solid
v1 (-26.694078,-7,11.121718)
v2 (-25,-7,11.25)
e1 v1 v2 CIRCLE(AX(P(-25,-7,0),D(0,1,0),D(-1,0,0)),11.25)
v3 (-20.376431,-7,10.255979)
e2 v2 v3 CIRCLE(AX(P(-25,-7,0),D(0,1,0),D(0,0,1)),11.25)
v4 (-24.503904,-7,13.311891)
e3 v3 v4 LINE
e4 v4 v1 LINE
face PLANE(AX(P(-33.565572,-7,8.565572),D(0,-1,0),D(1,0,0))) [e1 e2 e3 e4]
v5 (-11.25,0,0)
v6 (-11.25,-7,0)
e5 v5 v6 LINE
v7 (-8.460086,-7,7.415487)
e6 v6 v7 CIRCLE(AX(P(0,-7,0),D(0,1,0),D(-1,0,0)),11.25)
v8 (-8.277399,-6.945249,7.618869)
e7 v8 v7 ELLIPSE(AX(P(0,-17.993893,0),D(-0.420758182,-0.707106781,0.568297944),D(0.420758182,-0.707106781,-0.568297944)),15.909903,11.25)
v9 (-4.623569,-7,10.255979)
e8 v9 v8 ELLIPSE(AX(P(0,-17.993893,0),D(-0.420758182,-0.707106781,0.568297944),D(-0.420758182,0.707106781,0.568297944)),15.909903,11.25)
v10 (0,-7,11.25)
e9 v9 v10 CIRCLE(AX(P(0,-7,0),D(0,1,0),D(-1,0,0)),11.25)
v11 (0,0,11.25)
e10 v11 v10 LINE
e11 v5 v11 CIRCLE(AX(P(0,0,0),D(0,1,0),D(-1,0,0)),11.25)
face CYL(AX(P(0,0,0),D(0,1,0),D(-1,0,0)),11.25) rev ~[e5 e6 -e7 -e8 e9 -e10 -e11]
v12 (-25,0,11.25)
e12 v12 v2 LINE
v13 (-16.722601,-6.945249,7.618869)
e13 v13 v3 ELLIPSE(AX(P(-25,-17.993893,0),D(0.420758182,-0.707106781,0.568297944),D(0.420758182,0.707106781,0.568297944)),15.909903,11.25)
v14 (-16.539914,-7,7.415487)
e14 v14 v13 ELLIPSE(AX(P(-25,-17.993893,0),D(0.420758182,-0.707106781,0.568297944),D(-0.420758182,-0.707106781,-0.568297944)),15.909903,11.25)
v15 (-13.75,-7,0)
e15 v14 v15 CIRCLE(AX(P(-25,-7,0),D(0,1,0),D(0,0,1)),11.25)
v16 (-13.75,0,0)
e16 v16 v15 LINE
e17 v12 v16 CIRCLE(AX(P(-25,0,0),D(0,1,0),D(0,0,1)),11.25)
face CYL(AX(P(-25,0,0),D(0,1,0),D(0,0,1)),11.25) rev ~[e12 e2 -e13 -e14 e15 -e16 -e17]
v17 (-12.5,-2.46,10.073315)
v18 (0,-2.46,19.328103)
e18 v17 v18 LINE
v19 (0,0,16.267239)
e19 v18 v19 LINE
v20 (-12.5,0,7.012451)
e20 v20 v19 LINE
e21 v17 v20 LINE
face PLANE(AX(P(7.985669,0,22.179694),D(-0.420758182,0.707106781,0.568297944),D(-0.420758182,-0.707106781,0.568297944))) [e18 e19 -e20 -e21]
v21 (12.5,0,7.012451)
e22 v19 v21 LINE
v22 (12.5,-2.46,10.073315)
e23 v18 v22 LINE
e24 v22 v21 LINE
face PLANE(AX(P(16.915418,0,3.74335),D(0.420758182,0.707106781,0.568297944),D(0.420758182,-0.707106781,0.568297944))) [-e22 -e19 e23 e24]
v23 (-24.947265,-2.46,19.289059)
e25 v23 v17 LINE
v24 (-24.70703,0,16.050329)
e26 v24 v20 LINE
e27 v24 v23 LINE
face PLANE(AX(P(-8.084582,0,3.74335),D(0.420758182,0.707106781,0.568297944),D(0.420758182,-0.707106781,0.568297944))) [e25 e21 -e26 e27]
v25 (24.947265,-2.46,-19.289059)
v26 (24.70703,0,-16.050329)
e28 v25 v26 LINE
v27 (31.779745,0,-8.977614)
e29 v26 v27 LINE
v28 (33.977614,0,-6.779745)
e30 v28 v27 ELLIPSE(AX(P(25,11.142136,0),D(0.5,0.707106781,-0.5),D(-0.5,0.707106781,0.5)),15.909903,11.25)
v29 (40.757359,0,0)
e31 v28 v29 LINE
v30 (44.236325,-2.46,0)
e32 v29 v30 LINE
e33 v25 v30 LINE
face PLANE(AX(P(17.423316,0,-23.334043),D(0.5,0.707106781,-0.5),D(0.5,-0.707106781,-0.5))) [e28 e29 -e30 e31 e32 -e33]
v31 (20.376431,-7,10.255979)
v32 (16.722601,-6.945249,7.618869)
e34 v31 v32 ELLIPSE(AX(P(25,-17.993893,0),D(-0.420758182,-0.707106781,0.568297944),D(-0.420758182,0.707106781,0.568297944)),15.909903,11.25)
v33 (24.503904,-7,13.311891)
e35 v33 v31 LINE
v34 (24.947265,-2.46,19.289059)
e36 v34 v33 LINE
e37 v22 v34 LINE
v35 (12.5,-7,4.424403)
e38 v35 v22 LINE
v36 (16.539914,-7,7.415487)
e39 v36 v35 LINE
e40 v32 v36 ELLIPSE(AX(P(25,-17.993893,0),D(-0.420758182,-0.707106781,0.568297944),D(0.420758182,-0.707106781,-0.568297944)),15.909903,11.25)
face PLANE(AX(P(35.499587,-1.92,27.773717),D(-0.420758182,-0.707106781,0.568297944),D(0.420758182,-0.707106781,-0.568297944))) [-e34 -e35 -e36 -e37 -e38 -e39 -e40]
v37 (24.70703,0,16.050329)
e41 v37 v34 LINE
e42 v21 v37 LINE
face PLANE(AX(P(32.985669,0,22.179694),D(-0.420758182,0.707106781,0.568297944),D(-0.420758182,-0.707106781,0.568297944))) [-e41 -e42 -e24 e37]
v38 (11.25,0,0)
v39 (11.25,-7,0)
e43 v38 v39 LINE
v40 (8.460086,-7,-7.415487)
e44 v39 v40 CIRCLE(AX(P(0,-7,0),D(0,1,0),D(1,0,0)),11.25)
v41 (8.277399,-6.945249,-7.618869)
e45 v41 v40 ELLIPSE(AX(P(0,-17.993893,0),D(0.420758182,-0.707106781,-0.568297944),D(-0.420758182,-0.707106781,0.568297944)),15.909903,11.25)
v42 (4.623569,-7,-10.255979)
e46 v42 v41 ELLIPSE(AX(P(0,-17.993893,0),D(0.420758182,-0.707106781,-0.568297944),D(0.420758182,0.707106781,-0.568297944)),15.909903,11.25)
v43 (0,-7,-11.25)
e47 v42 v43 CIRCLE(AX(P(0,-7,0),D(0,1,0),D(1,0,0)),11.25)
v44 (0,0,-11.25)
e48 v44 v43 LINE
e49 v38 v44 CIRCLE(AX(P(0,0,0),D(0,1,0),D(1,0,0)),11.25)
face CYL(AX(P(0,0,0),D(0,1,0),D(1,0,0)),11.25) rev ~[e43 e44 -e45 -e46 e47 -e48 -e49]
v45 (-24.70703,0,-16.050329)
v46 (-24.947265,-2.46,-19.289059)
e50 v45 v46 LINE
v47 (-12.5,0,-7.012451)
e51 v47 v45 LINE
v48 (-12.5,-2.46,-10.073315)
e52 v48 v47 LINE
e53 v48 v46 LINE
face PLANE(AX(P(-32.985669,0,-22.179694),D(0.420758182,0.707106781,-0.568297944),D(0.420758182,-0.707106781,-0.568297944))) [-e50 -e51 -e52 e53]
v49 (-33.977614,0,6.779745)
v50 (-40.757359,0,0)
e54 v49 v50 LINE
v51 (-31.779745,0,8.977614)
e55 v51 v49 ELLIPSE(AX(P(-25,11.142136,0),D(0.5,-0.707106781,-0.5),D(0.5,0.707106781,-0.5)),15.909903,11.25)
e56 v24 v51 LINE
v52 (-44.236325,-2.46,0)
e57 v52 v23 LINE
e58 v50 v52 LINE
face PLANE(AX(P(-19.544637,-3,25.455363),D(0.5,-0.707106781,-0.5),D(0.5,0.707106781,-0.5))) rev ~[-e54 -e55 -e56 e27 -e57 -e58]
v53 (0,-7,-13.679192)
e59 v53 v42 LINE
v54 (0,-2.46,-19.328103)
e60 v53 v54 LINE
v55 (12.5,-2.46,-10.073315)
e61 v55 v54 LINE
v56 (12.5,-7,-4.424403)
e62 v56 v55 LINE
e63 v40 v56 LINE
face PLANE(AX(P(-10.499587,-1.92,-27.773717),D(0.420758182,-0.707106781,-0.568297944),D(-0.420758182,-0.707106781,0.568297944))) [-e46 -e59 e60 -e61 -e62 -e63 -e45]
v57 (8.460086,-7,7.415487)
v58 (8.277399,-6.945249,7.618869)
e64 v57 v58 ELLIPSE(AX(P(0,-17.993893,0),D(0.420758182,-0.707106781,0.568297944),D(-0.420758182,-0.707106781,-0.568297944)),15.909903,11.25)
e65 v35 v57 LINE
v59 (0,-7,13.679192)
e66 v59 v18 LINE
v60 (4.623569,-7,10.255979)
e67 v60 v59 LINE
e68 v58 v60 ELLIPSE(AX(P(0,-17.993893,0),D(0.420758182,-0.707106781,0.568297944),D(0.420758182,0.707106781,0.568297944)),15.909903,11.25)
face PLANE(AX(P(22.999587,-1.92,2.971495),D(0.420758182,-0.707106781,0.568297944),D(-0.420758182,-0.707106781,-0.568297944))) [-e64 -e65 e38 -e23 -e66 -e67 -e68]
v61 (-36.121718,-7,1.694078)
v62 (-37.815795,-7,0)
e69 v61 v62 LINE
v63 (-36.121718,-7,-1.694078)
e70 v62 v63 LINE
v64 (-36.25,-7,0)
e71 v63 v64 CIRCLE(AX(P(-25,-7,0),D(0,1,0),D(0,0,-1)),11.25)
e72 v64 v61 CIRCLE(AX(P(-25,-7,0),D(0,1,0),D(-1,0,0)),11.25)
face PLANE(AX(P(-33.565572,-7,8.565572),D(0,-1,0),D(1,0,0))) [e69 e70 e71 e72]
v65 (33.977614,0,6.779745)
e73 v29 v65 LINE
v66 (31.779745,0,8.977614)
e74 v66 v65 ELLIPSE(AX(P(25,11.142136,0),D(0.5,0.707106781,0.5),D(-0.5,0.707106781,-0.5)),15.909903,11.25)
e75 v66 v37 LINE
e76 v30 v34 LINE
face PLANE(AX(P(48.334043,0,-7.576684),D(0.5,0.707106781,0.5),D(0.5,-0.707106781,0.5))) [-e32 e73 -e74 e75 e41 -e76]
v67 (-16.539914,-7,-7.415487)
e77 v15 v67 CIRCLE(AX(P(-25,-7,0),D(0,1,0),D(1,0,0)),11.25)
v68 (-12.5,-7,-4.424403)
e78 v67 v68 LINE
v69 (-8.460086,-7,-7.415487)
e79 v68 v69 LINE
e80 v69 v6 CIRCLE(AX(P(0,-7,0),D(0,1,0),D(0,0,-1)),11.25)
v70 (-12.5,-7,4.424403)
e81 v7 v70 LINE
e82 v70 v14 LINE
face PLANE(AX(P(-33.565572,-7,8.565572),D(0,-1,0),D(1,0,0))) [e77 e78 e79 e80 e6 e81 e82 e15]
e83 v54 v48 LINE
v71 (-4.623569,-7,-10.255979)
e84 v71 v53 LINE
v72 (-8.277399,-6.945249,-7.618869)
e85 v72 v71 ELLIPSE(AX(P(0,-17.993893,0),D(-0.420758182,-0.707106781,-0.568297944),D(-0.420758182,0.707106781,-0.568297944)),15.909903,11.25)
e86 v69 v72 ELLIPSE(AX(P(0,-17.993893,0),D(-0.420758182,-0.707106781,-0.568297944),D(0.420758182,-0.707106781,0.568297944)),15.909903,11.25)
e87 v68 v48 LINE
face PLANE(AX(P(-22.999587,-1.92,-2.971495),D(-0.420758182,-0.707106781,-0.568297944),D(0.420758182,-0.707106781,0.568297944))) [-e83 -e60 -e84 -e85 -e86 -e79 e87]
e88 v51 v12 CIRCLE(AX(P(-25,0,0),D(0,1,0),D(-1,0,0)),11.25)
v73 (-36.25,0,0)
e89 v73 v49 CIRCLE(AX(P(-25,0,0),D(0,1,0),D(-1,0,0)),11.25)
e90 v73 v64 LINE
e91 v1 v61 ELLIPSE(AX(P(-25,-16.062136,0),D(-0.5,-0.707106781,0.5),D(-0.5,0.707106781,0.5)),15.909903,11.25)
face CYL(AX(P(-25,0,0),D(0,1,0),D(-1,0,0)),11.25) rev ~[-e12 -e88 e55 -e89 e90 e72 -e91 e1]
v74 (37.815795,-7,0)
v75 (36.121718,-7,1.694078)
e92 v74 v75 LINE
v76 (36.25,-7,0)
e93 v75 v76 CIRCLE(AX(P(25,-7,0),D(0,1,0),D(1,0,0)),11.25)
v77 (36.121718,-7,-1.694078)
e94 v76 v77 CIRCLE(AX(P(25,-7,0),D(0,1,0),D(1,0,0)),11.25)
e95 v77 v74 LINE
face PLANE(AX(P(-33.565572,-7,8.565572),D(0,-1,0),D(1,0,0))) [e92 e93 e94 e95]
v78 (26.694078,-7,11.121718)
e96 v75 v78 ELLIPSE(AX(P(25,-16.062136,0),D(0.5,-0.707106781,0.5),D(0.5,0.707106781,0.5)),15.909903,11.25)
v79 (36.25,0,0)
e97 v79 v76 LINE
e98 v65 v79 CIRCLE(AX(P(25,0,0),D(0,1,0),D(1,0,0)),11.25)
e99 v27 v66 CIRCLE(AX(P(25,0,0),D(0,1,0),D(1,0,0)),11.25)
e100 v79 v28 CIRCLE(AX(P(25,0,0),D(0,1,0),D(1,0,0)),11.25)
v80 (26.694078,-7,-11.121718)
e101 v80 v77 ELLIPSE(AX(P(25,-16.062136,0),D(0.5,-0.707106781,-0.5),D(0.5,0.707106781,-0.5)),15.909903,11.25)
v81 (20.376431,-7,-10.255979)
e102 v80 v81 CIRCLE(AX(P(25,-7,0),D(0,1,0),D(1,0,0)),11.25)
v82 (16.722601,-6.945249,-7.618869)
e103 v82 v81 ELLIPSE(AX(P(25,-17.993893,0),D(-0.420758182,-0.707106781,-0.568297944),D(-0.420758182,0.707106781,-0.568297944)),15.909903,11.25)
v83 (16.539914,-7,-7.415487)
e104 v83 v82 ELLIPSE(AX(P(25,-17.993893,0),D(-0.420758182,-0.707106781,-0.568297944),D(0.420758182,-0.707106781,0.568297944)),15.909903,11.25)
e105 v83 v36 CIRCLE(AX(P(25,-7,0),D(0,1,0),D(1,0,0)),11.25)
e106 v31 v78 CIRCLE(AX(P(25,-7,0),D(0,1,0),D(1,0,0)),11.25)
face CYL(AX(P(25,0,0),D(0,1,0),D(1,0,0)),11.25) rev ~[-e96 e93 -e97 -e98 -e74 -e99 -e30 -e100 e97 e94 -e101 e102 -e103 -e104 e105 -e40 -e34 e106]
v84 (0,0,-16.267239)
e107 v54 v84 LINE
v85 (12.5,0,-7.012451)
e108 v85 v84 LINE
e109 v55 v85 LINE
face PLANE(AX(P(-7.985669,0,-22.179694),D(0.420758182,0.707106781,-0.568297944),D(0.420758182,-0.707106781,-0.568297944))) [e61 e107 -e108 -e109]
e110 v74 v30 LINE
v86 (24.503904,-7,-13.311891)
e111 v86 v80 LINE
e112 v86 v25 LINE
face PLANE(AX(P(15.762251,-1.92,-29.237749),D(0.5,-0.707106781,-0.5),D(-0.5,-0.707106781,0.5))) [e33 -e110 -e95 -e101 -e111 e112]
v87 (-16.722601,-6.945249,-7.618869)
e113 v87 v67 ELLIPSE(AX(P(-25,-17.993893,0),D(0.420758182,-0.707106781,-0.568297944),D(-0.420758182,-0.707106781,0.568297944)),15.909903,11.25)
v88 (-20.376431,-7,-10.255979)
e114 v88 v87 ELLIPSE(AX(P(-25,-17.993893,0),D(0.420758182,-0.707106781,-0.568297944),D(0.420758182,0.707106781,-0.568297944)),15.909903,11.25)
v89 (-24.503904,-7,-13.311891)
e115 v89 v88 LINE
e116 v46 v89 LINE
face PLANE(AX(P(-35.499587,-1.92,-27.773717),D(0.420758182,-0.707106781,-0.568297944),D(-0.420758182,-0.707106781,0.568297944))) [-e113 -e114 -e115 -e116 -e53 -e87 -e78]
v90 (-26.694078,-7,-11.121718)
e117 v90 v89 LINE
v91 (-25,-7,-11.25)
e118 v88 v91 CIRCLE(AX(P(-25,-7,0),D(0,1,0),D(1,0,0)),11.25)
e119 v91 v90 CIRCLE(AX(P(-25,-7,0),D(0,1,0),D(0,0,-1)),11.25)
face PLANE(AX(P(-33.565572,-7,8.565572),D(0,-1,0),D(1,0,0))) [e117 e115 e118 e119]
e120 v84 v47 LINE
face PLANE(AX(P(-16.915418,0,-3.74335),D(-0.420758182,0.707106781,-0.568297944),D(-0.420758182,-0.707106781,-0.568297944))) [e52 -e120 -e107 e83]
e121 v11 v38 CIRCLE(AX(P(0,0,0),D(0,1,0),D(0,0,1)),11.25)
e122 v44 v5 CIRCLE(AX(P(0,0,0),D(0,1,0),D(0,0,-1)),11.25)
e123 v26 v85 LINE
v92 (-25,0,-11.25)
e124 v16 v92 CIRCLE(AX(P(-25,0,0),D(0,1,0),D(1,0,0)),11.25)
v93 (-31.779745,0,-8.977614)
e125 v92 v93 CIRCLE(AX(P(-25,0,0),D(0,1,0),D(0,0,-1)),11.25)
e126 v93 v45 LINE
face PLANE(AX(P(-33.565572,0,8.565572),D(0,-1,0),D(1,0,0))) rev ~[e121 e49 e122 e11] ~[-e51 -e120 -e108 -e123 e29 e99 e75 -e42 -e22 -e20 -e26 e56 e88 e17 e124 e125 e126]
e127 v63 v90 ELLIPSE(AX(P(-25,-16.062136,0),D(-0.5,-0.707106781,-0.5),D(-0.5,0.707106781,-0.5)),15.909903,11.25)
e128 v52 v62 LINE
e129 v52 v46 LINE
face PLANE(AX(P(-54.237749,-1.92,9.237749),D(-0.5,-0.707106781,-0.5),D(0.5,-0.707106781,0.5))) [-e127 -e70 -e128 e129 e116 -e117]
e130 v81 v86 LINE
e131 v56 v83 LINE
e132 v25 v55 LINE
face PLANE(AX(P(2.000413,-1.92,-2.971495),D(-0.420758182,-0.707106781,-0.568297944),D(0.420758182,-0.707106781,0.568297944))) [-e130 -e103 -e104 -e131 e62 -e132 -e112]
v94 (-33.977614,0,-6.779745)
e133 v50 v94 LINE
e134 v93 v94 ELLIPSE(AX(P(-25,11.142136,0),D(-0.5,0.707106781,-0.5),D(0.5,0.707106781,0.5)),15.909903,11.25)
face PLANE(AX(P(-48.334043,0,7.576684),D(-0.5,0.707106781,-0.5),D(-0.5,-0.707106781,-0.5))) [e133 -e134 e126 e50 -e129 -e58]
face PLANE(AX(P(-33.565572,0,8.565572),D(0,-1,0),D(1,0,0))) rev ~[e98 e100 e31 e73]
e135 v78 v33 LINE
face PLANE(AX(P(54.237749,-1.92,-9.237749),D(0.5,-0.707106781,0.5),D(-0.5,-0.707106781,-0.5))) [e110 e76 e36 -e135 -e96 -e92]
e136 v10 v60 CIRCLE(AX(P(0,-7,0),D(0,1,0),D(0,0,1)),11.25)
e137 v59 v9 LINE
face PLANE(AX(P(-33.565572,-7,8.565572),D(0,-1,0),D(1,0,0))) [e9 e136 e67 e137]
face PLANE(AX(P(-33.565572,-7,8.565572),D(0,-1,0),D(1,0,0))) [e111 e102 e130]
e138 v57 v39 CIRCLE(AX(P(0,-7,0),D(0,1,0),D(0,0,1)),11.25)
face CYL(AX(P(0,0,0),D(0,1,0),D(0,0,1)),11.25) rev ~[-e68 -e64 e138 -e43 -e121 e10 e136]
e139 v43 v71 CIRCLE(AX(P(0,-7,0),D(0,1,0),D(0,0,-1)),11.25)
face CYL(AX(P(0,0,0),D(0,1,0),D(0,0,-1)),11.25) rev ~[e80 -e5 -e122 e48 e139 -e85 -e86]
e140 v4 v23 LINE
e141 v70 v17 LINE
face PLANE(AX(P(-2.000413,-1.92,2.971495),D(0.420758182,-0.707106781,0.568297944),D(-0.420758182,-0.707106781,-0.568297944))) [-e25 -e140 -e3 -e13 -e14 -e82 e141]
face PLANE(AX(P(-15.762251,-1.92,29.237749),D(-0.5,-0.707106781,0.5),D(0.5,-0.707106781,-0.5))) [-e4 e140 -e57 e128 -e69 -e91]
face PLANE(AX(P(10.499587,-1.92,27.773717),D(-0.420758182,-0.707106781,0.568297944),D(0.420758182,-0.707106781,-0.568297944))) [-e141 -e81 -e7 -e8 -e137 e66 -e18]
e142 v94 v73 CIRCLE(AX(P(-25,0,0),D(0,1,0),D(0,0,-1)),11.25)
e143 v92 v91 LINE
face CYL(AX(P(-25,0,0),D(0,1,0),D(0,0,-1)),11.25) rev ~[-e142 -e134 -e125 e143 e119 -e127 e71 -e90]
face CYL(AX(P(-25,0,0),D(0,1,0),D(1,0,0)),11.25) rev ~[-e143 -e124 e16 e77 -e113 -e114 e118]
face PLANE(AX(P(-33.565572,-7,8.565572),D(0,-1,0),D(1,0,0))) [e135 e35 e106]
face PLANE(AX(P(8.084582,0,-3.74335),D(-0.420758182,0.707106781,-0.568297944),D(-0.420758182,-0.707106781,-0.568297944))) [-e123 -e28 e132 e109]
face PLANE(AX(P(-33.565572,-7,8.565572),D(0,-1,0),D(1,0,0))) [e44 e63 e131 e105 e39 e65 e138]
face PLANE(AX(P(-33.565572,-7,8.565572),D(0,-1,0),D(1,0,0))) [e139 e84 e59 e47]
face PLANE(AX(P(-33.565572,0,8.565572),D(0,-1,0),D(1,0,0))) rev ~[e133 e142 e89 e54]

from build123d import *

# Parameters (mm, degrees)
F1_DEPTH      = 7
F2_T1_DEPTH   = 54.4125704052
F2_T3_DEPTH   = 54.4125704052
F2_T5_DEPTH   = 54.4125704052
F2_T7_DEPTH   = 54.4125704052
F2_T12_DEPTH  = 41.6814695772
F2_T17_DEPTH  = 41.6814695772
F2_T22_DEPTH  = 41.6814695772
F2_T27_DEPTH  = 41.6814695772
F2_T32_DEPTH  = 41.6814695772
F2_T37_DEPTH  = 41.6814695772
F2_T42_DEPTH  = 41.6814695772
F2_T47_DEPTH  = 41.6814695772
F2_T53_DEPTH  = 41.6814695772
F2_S55_R      = 11.25
F2_T56_DEPTH  = 25
F2_T59_DEPTH  = 41.6814695772
F2_S61_R      = 11.25
F2_T62_DEPTH  = 25
F2_T68_DEPTH  = 41.6814695772
F2_S70_R      = 11.25
F2_T71_DEPTH  = 25
F2_T74_DEPTH  = 41.6814695772
F2_S76_R      = 11.25
F2_T77_DEPTH  = 25
F2_T83_DEPTH  = 41.6814695772
F2_S85_R      = 11.25
F2_T86_DEPTH  = 25
F2_T89_DEPTH  = 41.6814695772
F2_S91_R      = 11.25
F2_T92_DEPTH  = 25
F2_T98_DEPTH  = 41.6814695772
F2_S100_R     = 11.25
F2_T101_DEPTH = 25
F2_T104_DEPTH = 41.6814695772
F2_S106_R     = 11.25
F2_T107_DEPTH = 25
F3_T1_DEPTH   = 43.7143691753
F3_T3_DEPTH   = 43.7143691753
F3_T5_DEPTH   = 43.7143691753
F3_T7_DEPTH   = 43.7143691753
F3_T12_DEPTH  = 30.9832683473
F3_T17_DEPTH  = 30.9832683473
F3_T22_DEPTH  = 30.9832683473
F3_T27_DEPTH  = 30.9832683473
F3_T32_DEPTH  = 30.9832683473
F3_T37_DEPTH  = 30.9832683473
F3_T42_DEPTH  = 30.9832683473
F3_T47_DEPTH  = 30.9832683473
F3_T53_DEPTH  = 30.9832683473
F3_T57_DEPTH  = 30.9832683473
F3_T64_DEPTH  = 30.9832683473
F3_T68_DEPTH  = 30.9832683473
F3_T75_DEPTH  = 30.9832683473
F3_T79_DEPTH  = 30.9832683473
F3_T86_DEPTH  = 30.9832683473
F3_T90_DEPTH  = 30.9832683473


# Not quite as in the source:
# - a fillet or chamfer that OpenCascade refuses, or shapes differently, is made with other operations: its cross-section is extruded or revolved along the edge and cut away or added


with BuildPart() as f1:
    # F0 (on Front) → F1 (new body)
    with BuildSketch(Plane.XZ):
        with BuildLine():
            Line((-25, 11.25), (-25, 20))
            Line((-25, 20), (-45, 0))
            Line((-45, 0), (-36.25, 0))
            ThreePointArc((-36.25, 0), (-32.9549512883, 7.9549512883), (-25, 11.25))
        make_face()
        with BuildLine():
            Line((-13.75, 0), (-12.5, 0))
            Line((-12.5, 0), (-12.5, 10.7452115044))
            Line((-12.5, 10.7452115044), (-25, 20))
            Line((-25, 20), (-25, 11.25))
            ThreePointArc((-25, 11.25), (-17.0450487117, 7.9549512883), (-13.75, 0))
        make_face()
        with BuildLine():
            Line((-12.5, -10.7452115044), (-12.5, 0))
            Line((-12.5, 0), (-13.75, 0))
            ThreePointArc((-13.75, 0), (-17.0450487117, -7.9549512883), (-25, -11.25))
            Line((-25, -11.25), (-25, -20))
            Line((-25, -20), (-12.5, -10.7452115044))
        make_face()
        with BuildLine():
            Line((-45, 0), (-25, -20))
            Line((-25, -20), (-25, -11.25))
            ThreePointArc((-25, -11.25), (-32.9549512883, -7.9549512883), (-36.25, 0))
            Line((-36.25, 0), (-45, 0))
        make_face()
        with BuildLine():
            Line((0, -20), (0, -11.25))
            ThreePointArc((0, -11.25), (-7.9549512883, -7.9549512883), (-11.25, 0))
            Line((-11.25, 0), (-12.5, 0))
            Line((-12.5, 0), (-12.5, -10.7452115044))
            Line((-12.5, -10.7452115044), (0, -20))
        make_face()
        with BuildLine():
            Line((12.5, 0), (11.25, 0))
            ThreePointArc((11.25, 0), (7.9549512883, -7.9549512883), (0, -11.25))
            Line((0, -11.25), (0, -20))
            Line((0, -20), (12.5, -10.7452115044))
            Line((12.5, -10.7452115044), (12.5, 0))
        make_face()
        with BuildLine():
            ThreePointArc((0, 11.25), (7.9549512883, 7.9549512883), (11.25, 0))
            Line((11.25, 0), (12.5, 0))
            Line((12.5, 0), (12.5, 10.7452115044))
            Line((12.5, 10.7452115044), (0, 20))
            Line((0, 20), (0, 11.25))
        make_face()
        with BuildLine():
            ThreePointArc((-11.25, 0), (-7.9549512883, 7.9549512883), (0, 11.25))
            Line((0, 11.25), (0, 20))
            Line((0, 20), (-12.5, 10.7452115044))
            Line((-12.5, 10.7452115044), (-12.5, 0))
            Line((-12.5, 0), (-11.25, 0))
        make_face()
        with BuildLine():
            Line((12.5, 10.7452115044), (12.5, 0))
            Line((12.5, 0), (13.75, 0))
            ThreePointArc((13.75, 0), (25, 11.25), (36.25, 0))
            Line((36.25, 0), (45, 0))
            Line((45, 0), (25, 20))
            Line((25, 20), (12.5, 10.7452115044))
        make_face()
        with BuildLine():
            Line((13.75, 0), (12.5, 0))
            Line((12.5, 0), (12.5, -10.7452115044))
            Line((12.5, -10.7452115044), (25, -20))
            Line((25, -20), (45, 0))
            Line((45, 0), (36.25, 0))
            ThreePointArc((36.25, 0), (25, -11.25), (13.75, 0))
        make_face()
    extrude(amount=F1_DEPTH)

    # F2: chamfer of 5.08 on 12 edges, made by hand

    # F2_s2 → F2_t1 (cut)
    with BuildSketch(Plane(origin=(6.7377487577, 0, 6.7377487577), x_dir=(0, 1, 0), z_dir=(-0.7071067812, 0, -0.7071067812))):
        Polygon((-1.92, -31.8198051534), (-7, -26.7398051534), (-7, -31.8198051534), align=None)
    extrude(amount=F2_T1_DEPTH, mode=Mode.SUBTRACT)

    # F2_s4 → F2_t3 (cut)
    with BuildSketch(Plane(origin=(31.7377487577, 0, -31.7377487577), x_dir=(0, 1, 0), z_dir=(-0.7071067812, 0, 0.7071067812))):
        Polygon((-1.92, -31.8198051534), (-7, -26.7398051534), (-7, -31.8198051534), align=None)
    extrude(amount=F2_T3_DEPTH, mode=Mode.SUBTRACT)

    # F2_s6 → F2_t5 (cut)
    with BuildSketch(Plane(origin=(-6.7377487577, 0, -6.7377487577), x_dir=(0, 1, 0), z_dir=(0.7071067812, 0, 0.7071067812))):
        Polygon((-1.92, -31.8198051534), (-7, -26.7398051534), (-7, -31.8198051534), align=None)
    extrude(amount=F2_T5_DEPTH, mode=Mode.SUBTRACT)

    # F2_s8 → F2_t7 (cut)
    with BuildSketch(Plane(origin=(-31.7377487577, 0, 31.7377487577), x_dir=(0, 1, 0), z_dir=(0.7071067812, 0, -0.7071067812))):
        Polygon((-1.92, -31.8198051534), (-7, -26.7398051534), (-7, -31.8198051534), align=None)
    extrude(amount=F2_T7_DEPTH, mode=Mode.SUBTRACT)


with BuildPart() as f2_tool10:
    # F2_s11 → F2_t12 (new body)
    with BuildSketch(Plane(origin=(-2.7131807604, 0, 2.008793127), x_dir=(0, 1, 0), z_dir=(-0.8036946592, 0, 0.5950419269))):
        Polygon((-1.92, -1.1978450121), (-7, 3.8821549879), (-7, -1.1978450121), align=None)
    extrude(amount=F2_T12_DEPTH)

    split(bisect_by=Plane(origin=(-9.5646403729, 0, 12.918502105), x_dir=(0, 1, 0), z_dir=(-0.5950419269, 0, 0.8036946592)), keep=Keep.TOP)


with BuildPart() as f1_1:
    add(f1.part)

    # F2_t9: cut F2_tool10
    add(f2_tool10.part, mode=Mode.SUBTRACT)


with BuildPart() as f2_tool15:
    # F2_s16 → F2_t17 (new body)
    with BuildSketch(Plane(origin=(20.0642276166, 0, 14.8552146336), x_dir=(0, 1, 0), z_dir=(-0.8036946592, 0, -0.5950419269))):
        Polygon((-1.92, -16.0738931843), (-7, -10.9938931843), (-7, -16.0738931843), align=None)
    extrude(amount=F2_T17_DEPTH)

    split(bisect_by=Plane(origin=(0.7127680041, 0, 0.9627016388), x_dir=(0, 1, 0), z_dir=(0.5950419269, 0, 0.8036946592)), keep=Keep.TOP)


with BuildPart() as f1_2:
    add(f1_1.part)

    # F2_t14: cut F2_tool15
    add(f2_tool15.part, mode=Mode.SUBTRACT)


with BuildPart() as f2_tool20:
    # F2_s21 → F2_t22 (new body)
    with BuildSketch(Plane(origin=(13.4349468708, 0, -9.9470073391), x_dir=(0, 1, 0), z_dir=(-0.8036946592, 0, 0.5950419269))):
        Polygon((-1.92, -16.0738931843), (-7, -10.9938931843), (-7, -16.0738931843), align=None)
    extrude(amount=F2_T22_DEPTH)

    split(bisect_by=Plane(origin=(-0.7127680041, 0, 0.9627016388), x_dir=(0, 1, 0), z_dir=(-0.5950419269, 0, 0.8036946592)), keep=Keep.TOP)


with BuildPart() as f1_3:
    add(f1_2.part)

    # F2_t19: cut F2_tool20
    add(f2_tool20.part, mode=Mode.SUBTRACT)


with BuildPart() as f2_tool25:
    # F2_s26 → F2_t27 (new body)
    with BuildSketch(Plane(origin=(36.2123552478, 0, 26.8110150997), x_dir=(0, 1, 0), z_dir=(-0.8036946592, 0, -0.5950419269))):
        Polygon((-1.92, -1.1978450121), (-7, 3.8821549879), (-7, -1.1978450121), align=None)
    extrude(amount=F2_T27_DEPTH)

    split(bisect_by=Plane(origin=(9.5646403729, 0, 12.918502105), x_dir=(0, 1, 0), z_dir=(0.5950419269, 0, 0.8036946592)), keep=Keep.TOP)


with BuildPart() as f1_4:
    add(f1_3.part)

    # F2_t24: cut F2_tool25
    add(f2_tool25.part, mode=Mode.SUBTRACT)


with BuildPart() as f2_tool30:
    # F2_s31 → F2_t32 (new body)
    with BuildSketch(Plane(origin=(2.7131807604, 0, -2.008793127), x_dir=(0, 1, 0), z_dir=(0.8036946592, 0, -0.5950419269))):
        Polygon((-1.92, -1.1978450121), (-7, 3.8821549879), (-7, -1.1978450121), align=None)
    extrude(amount=F2_T32_DEPTH)

    split(bisect_by=Plane(origin=(9.5646403729, 0, -12.918502105), x_dir=(0, 1, 0), z_dir=(0.5950419269, 0, -0.8036946592)), keep=Keep.TOP)


with BuildPart() as f1_5:
    add(f1_4.part)

    # F2_t29: cut F2_tool30
    add(f2_tool30.part, mode=Mode.SUBTRACT)


with BuildPart() as f2_tool35:
    # F2_s36 → F2_t37 (new body)
    with BuildSketch(Plane(origin=(-20.0642276166, 0, -14.8552146336), x_dir=(0, 1, 0), z_dir=(0.8036946592, 0, 0.5950419269))):
        Polygon((-1.92, -16.0738931843), (-7, -10.9938931843), (-7, -16.0738931843), align=None)
    extrude(amount=F2_T37_DEPTH)

    split(bisect_by=Plane(origin=(-0.7127680041, 0, -0.9627016388), x_dir=(0, 1, 0), z_dir=(-0.5950419269, 0, -0.8036946592)), keep=Keep.TOP)


with BuildPart() as f1_6:
    add(f1_5.part)

    # F2_t34: cut F2_tool35
    add(f2_tool35.part, mode=Mode.SUBTRACT)


with BuildPart() as f2_tool40:
    # F2_s41 → F2_t42 (new body)
    with BuildSketch(Plane(origin=(-13.4349468708, 0, 9.9470073391), x_dir=(0, 1, 0), z_dir=(0.8036946592, 0, -0.5950419269))):
        Polygon((-1.92, -16.0738931843), (-7, -10.9938931843), (-7, -16.0738931843), align=None)
    extrude(amount=F2_T42_DEPTH)

    split(bisect_by=Plane(origin=(0.7127680041, 0, -0.9627016388), x_dir=(0, 1, 0), z_dir=(0.5950419269, 0, -0.8036946592)), keep=Keep.TOP)


with BuildPart() as f1_7:
    add(f1_6.part)

    # F2_t39: cut F2_tool40
    add(f2_tool40.part, mode=Mode.SUBTRACT)


with BuildPart() as f2_tool45:
    # F2_s46 → F2_t47 (new body)
    with BuildSketch(Plane(origin=(-36.2123552478, 0, -26.8110150997), x_dir=(0, 1, 0), z_dir=(0.8036946592, 0, 0.5950419269))):
        Polygon((-1.92, -1.1978450121), (-7, 3.8821549879), (-7, -1.1978450121), align=None)
    extrude(amount=F2_T47_DEPTH)

    split(bisect_by=Plane(origin=(-9.5646403729, 0, -12.918502105), x_dir=(0, 1, 0), z_dir=(-0.5950419269, 0, -0.8036946592)), keep=Keep.TOP)


with BuildPart() as f1_8:
    add(f1_7.part)

    # F2_t44: cut F2_tool45
    add(f2_tool45.part, mode=Mode.SUBTRACT)


with BuildPart() as f2_tool51:
    # F2_s52 → F2_t53 (new body)
    with BuildSketch(Plane(origin=(20.0642276166, 0, 14.8552146336), x_dir=(0, 1, 0), z_dir=(-0.8036946592, 0, -0.5950419269))):
        Polygon((-1.92, -16.0738931843), (-7, -10.9938931843), (-7, -16.0738931843), align=None)
    extrude(amount=F2_T53_DEPTH)

    split(bisect_by=Plane(origin=(0.7127680041, 0, 0.9627016388), x_dir=(0, 1, 0), z_dir=(-0.5950419269, 0, -0.8036946592)), keep=Keep.TOP)

    # F2_s55 → F2_t56 (cut, symmetric)
    with BuildSketch(Plane.XZ.offset(4.5)):
        with Locations((-25, 0)):
            Circle(F2_S55_R)
    extrude(amount=F2_T56_DEPTH, both=True, mode=Mode.SUBTRACT)


with BuildPart() as f2_tool57:
    # F2_s58 → F2_t59 (new body)
    with BuildSketch(Plane(origin=(-2.7131807604, 0, 2.008793127), x_dir=(0, 1, 0), z_dir=(-0.8036946592, 0, 0.5950419269))):
        Polygon((-1.92, -1.1978450121), (-7, 3.8821549879), (-7, -1.1978450121), align=None)
    extrude(amount=F2_T59_DEPTH)

    split(bisect_by=Plane(origin=(-9.5646403729, 0, 12.918502105), x_dir=(0, 1, 0), z_dir=(0.5950419269, 0, -0.8036946592)), keep=Keep.TOP)

    # F2_s61 → F2_t62 (cut, symmetric)
    with BuildSketch(Plane.XZ.offset(4.5)):
        Circle(F2_S61_R)
    extrude(amount=F2_T62_DEPTH, both=True, mode=Mode.SUBTRACT)


with BuildPart() as f2_tool51_1:
    add(f2_tool51.part)

    # F2_t63: intersect F2_tool57
    add(f2_tool57.part, mode=Mode.INTERSECT)


with BuildPart() as f1_9:
    add(f1_8.part)

    # F2_t49: cut F2_tool51
    add(f2_tool51_1.part, mode=Mode.SUBTRACT)


with BuildPart() as f2_tool66:
    # F2_s67 → F2_t68 (new body)
    with BuildSketch(Plane(origin=(36.2123552478, 0, 26.8110150997), x_dir=(0, 1, 0), z_dir=(-0.8036946592, 0, -0.5950419269))):
        Polygon((-1.92, -1.1978450121), (-7, 3.8821549879), (-7, -1.1978450121), align=None)
    extrude(amount=F2_T68_DEPTH)

    split(bisect_by=Plane(origin=(9.5646403729, 0, 12.918502105), x_dir=(0, 1, 0), z_dir=(-0.5950419269, 0, -0.8036946592)), keep=Keep.TOP)

    # F2_s70 → F2_t71 (cut, symmetric)
    with BuildSketch(Plane.XZ.offset(4.5)):
        Circle(F2_S70_R)
    extrude(amount=F2_T71_DEPTH, both=True, mode=Mode.SUBTRACT)


with BuildPart() as f2_tool72:
    # F2_s73 → F2_t74 (new body)
    with BuildSketch(Plane(origin=(13.4349468708, 0, -9.9470073391), x_dir=(0, 1, 0), z_dir=(-0.8036946592, 0, 0.5950419269))):
        Polygon((-1.92, -16.0738931843), (-7, -10.9938931843), (-7, -16.0738931843), align=None)
    extrude(amount=F2_T74_DEPTH)

    split(bisect_by=Plane(origin=(-0.7127680041, 0, 0.9627016388), x_dir=(0, 1, 0), z_dir=(0.5950419269, 0, -0.8036946592)), keep=Keep.TOP)

    # F2_s76 → F2_t77 (cut, symmetric)
    with BuildSketch(Plane.XZ.offset(4.5)):
        with Locations((25, 0)):
            Circle(F2_S76_R)
    extrude(amount=F2_T77_DEPTH, both=True, mode=Mode.SUBTRACT)


with BuildPart() as f2_tool66_1:
    add(f2_tool66.part)

    # F2_t78: intersect F2_tool72
    add(f2_tool72.part, mode=Mode.INTERSECT)


with BuildPart() as f1_10:
    add(f1_9.part)

    # F2_t64: cut F2_tool66
    add(f2_tool66_1.part, mode=Mode.SUBTRACT)


with BuildPart() as f2_tool81:
    # F2_s82 → F2_t83 (new body)
    with BuildSketch(Plane(origin=(-20.0642276166, 0, -14.8552146336), x_dir=(0, 1, 0), z_dir=(0.8036946592, 0, 0.5950419269))):
        Polygon((-1.92, -16.0738931843), (-7, -10.9938931843), (-7, -16.0738931843), align=None)
    extrude(amount=F2_T83_DEPTH)

    split(bisect_by=Plane(origin=(-0.7127680041, 0, -0.9627016388), x_dir=(0, 1, 0), z_dir=(0.5950419269, 0, 0.8036946592)), keep=Keep.TOP)

    # F2_s85 → F2_t86 (cut, symmetric)
    with BuildSketch(Plane.XZ.offset(4.5)):
        with Locations((25, 0)):
            Circle(F2_S85_R)
    extrude(amount=F2_T86_DEPTH, both=True, mode=Mode.SUBTRACT)


with BuildPart() as f2_tool87:
    # F2_s88 → F2_t89 (new body)
    with BuildSketch(Plane(origin=(2.7131807604, 0, -2.008793127), x_dir=(0, 1, 0), z_dir=(0.8036946592, 0, -0.5950419269))):
        Polygon((-1.92, -1.1978450121), (-7, 3.8821549879), (-7, -1.1978450121), align=None)
    extrude(amount=F2_T89_DEPTH)

    split(bisect_by=Plane(origin=(9.5646403729, 0, -12.918502105), x_dir=(0, 1, 0), z_dir=(-0.5950419269, 0, 0.8036946592)), keep=Keep.TOP)

    # F2_s91 → F2_t92 (cut, symmetric)
    with BuildSketch(Plane.XZ.offset(4.5)):
        Circle(F2_S91_R)
    extrude(amount=F2_T92_DEPTH, both=True, mode=Mode.SUBTRACT)


with BuildPart() as f2_tool81_1:
    add(f2_tool81.part)

    # F2_t93: intersect F2_tool87
    add(f2_tool87.part, mode=Mode.INTERSECT)


with BuildPart() as f1_11:
    add(f1_10.part)

    # F2_t79: cut F2_tool81
    add(f2_tool81_1.part, mode=Mode.SUBTRACT)


with BuildPart() as f2_tool96:
    # F2_s97 → F2_t98 (new body)
    with BuildSketch(Plane(origin=(-36.2123552478, 0, -26.8110150997), x_dir=(0, 1, 0), z_dir=(0.8036946592, 0, 0.5950419269))):
        Polygon((-1.92, -1.1978450121), (-7, 3.8821549879), (-7, -1.1978450121), align=None)
    extrude(amount=F2_T98_DEPTH)

    split(bisect_by=Plane(origin=(-9.5646403729, 0, -12.918502105), x_dir=(0, 1, 0), z_dir=(0.5950419269, 0, 0.8036946592)), keep=Keep.TOP)

    # F2_s100 → F2_t101 (cut, symmetric)
    with BuildSketch(Plane.XZ.offset(4.5)):
        Circle(F2_S100_R)
    extrude(amount=F2_T101_DEPTH, both=True, mode=Mode.SUBTRACT)


with BuildPart() as f2_tool102:
    # F2_s103 → F2_t104 (new body)
    with BuildSketch(Plane(origin=(-13.4349468708, 0, 9.9470073391), x_dir=(0, 1, 0), z_dir=(0.8036946592, 0, -0.5950419269))):
        Polygon((-1.92, -16.0738931843), (-7, -10.9938931843), (-7, -16.0738931843), align=None)
    extrude(amount=F2_T104_DEPTH)

    split(bisect_by=Plane(origin=(0.7127680041, 0, -0.9627016388), x_dir=(0, 1, 0), z_dir=(-0.5950419269, 0, 0.8036946592)), keep=Keep.TOP)

    # F2_s106 → F2_t107 (cut, symmetric)
    with BuildSketch(Plane.XZ.offset(4.5)):
        with Locations((-25, 0)):
            Circle(F2_S106_R)
    extrude(amount=F2_T107_DEPTH, both=True, mode=Mode.SUBTRACT)


with BuildPart() as f2_tool96_1:
    add(f2_tool96.part)

    # F2_t108: intersect F2_tool102
    add(f2_tool102.part, mode=Mode.INTERSECT)


with BuildPart() as f1_12:
    add(f1_11.part)

    # F2_t94: cut F2_tool96
    add(f2_tool96_1.part, mode=Mode.SUBTRACT)

    # F3: chamfer of 3 on 12 edges, made by hand

    # F3_s2 → F3_t1 (cut)
    with BuildSketch(Plane(origin=(-2.9553634396, 0, -2.9553634396), x_dir=(0, 1, 0), z_dir=(0.7071067812, 0, 0.7071067812))):
        Polygon((0, -28.8198051534), (-3, -31.8198051534), (0, -31.8198051534), align=None)
    extrude(amount=F3_T1_DEPTH, mode=Mode.SUBTRACT)

    # F3_s4 → F3_t3 (cut)
    with BuildSketch(Plane(origin=(-27.9553634396, 0, 27.9553634396), x_dir=(0, 1, 0), z_dir=(0.7071067812, 0, -0.7071067812))):
        Polygon((0, -28.8198051534), (-3, -31.8198051534), (0, -31.8198051534), align=None)
    extrude(amount=F3_T3_DEPTH, mode=Mode.SUBTRACT)

    # F3_s6 → F3_t5 (cut)
    with BuildSketch(Plane(origin=(2.9553634396, 0, 2.9553634396), x_dir=(0, 1, 0), z_dir=(-0.7071067812, 0, -0.7071067812))):
        Polygon((-3, -31.8198051534), (0, -28.8198051534), (0, -31.8198051534), align=None)
    extrude(amount=F3_T5_DEPTH, mode=Mode.SUBTRACT)

    # F3_s8 → F3_t7 (cut)
    with BuildSketch(Plane(origin=(27.9553634396, 0, -27.9553634396), x_dir=(0, 1, 0), z_dir=(-0.7071067812, 0, 0.7071067812))):
        Polygon((0, -28.8198051534), (-3, -31.8198051534), (0, -31.8198051534), align=None)
    extrude(amount=F3_T7_DEPTH, mode=Mode.SUBTRACT)


with BuildPart() as f3_tool10:
    # F3_s11 → F3_t12 (new body)
    with BuildSketch(Plane(origin=(7.0122243563, 0, -5.1917322641), x_dir=(0, 1, 0), z_dir=(0.8036946592, 0, -0.5950419269))):
        Polygon((0, 1.8021549879), (-3, -1.1978450121), (0, -1.1978450121), align=None)
    extrude(amount=F3_T12_DEPTH)

    split(bisect_by=Plane(origin=(9.5646403729, 0, -12.918502105), x_dir=(0, 1, 0), z_dir=(0.5950419269, 0, -0.8036946592)), keep=Keep.TOP)


with BuildPart() as f1_13:
    add(f1_12.part)

    # F3_t9: cut F3_tool10
    add(f3_tool10.part, mode=Mode.SUBTRACT)


with BuildPart() as f3_tool15:
    # F3_s16 → F3_t17 (new body)
    with BuildSketch(Plane(origin=(-15.7651840208, 0, -11.6722754965), x_dir=(0, 1, 0), z_dir=(0.8036946592, 0, 0.5950419269))):
        Polygon((0, -13.0738931843), (-3, -16.0738931843), (0, -16.0738931843), align=None)
    extrude(amount=F3_T17_DEPTH)

    split(bisect_by=Plane(origin=(-0.7127680041, 0, -0.9627016388), x_dir=(0, 1, 0), z_dir=(-0.5950419269, 0, -0.8036946592)), keep=Keep.TOP)


with BuildPart() as f1_14:
    add(f1_13.part)

    # F3_t14: cut F3_tool15
    add(f3_tool15.part, mode=Mode.SUBTRACT)


with BuildPart() as f3_tool20:
    # F3_s21 → F3_t22 (new body)
    with BuildSketch(Plane(origin=(-9.1359032749, 0, 6.7640682021), x_dir=(0, 1, 0), z_dir=(0.8036946592, 0, -0.5950419269))):
        Polygon((0, -13.0738931843), (-3, -16.0738931843), (0, -16.0738931843), align=None)
    extrude(amount=F3_T22_DEPTH)

    split(bisect_by=Plane(origin=(0.7127680041, 0, -0.9627016388), x_dir=(0, 1, 0), z_dir=(0.5950419269, 0, -0.8036946592)), keep=Keep.TOP)


with BuildPart() as f1_15:
    add(f1_14.part)

    # F3_t19: cut F3_tool20
    add(f3_tool20.part, mode=Mode.SUBTRACT)


with BuildPart() as f3_tool25:
    # F3_s26 → F3_t27 (new body)
    with BuildSketch(Plane(origin=(-31.913311652, 0, -23.6280759627), x_dir=(0, 1, 0), z_dir=(0.8036946592, 0, 0.5950419269))):
        Polygon((0, 1.8021549879), (-3, -1.1978450121), (0, -1.1978450121), align=None)
    extrude(amount=F3_T27_DEPTH)

    split(bisect_by=Plane(origin=(-9.5646403729, 0, -12.918502105), x_dir=(0, 1, 0), z_dir=(-0.5950419269, 0, -0.8036946592)), keep=Keep.TOP)


with BuildPart() as f1_16:
    add(f1_15.part)

    # F3_t24: cut F3_tool25
    add(f3_tool25.part, mode=Mode.SUBTRACT)


with BuildPart() as f3_tool30:
    # F3_s31 → F3_t32 (new body)
    with BuildSketch(Plane(origin=(-7.0122243563, 0, 5.1917322641), x_dir=(0, 1, 0), z_dir=(-0.8036946592, 0, 0.5950419269))):
        Polygon((0, 1.8021549879), (-3, -1.1978450121), (0, -1.1978450121), align=None)
    extrude(amount=F3_T32_DEPTH)

    split(bisect_by=Plane(origin=(-9.5646403729, 0, 12.918502105), x_dir=(0, 1, 0), z_dir=(-0.5950419269, 0, 0.8036946592)), keep=Keep.TOP)


with BuildPart() as f1_17:
    add(f1_16.part)

    # F3_t29: cut F3_tool30
    add(f3_tool30.part, mode=Mode.SUBTRACT)


with BuildPart() as f3_tool35:
    # F3_s36 → F3_t37 (new body)
    with BuildSketch(Plane(origin=(15.7651840208, 0, 11.6722754965), x_dir=(0, 1, 0), z_dir=(-0.8036946592, 0, -0.5950419269))):
        Polygon((0, -13.0738931843), (-3, -16.0738931843), (0, -16.0738931843), align=None)
    extrude(amount=F3_T37_DEPTH)

    split(bisect_by=Plane(origin=(0.7127680041, 0, 0.9627016388), x_dir=(0, 1, 0), z_dir=(0.5950419269, 0, 0.8036946592)), keep=Keep.TOP)


with BuildPart() as f1_18:
    add(f1_17.part)

    # F3_t34: cut F3_tool35
    add(f3_tool35.part, mode=Mode.SUBTRACT)


with BuildPart() as f3_tool40:
    # F3_s41 → F3_t42 (new body)
    with BuildSketch(Plane(origin=(9.1359032749, 0, -6.7640682021), x_dir=(0, 1, 0), z_dir=(-0.8036946592, 0, 0.5950419269))):
        Polygon((0, -13.0738931843), (-3, -16.0738931843), (0, -16.0738931843), align=None)
    extrude(amount=F3_T42_DEPTH)

    split(bisect_by=Plane(origin=(-0.7127680041, 0, 0.9627016388), x_dir=(0, 1, 0), z_dir=(-0.5950419269, 0, 0.8036946592)), keep=Keep.TOP)


with BuildPart() as f1_19:
    add(f1_18.part)

    # F3_t39: cut F3_tool40
    add(f3_tool40.part, mode=Mode.SUBTRACT)


with BuildPart() as f3_tool45:
    # F3_s46 → F3_t47 (new body)
    with BuildSketch(Plane(origin=(31.913311652, 0, 23.6280759627), x_dir=(0, 1, 0), z_dir=(-0.8036946592, 0, -0.5950419269))):
        Polygon((0, 1.8021549879), (-3, -1.1978450121), (0, -1.1978450121), align=None)
    extrude(amount=F3_T47_DEPTH)

    split(bisect_by=Plane(origin=(9.5646403729, 0, 12.918502105), x_dir=(0, 1, 0), z_dir=(0.5950419269, 0, 0.8036946592)), keep=Keep.TOP)


with BuildPart() as f1_20:
    add(f1_19.part)

    # F3_t44: cut F3_tool45
    add(f3_tool45.part, mode=Mode.SUBTRACT)


with BuildPart() as f3_tool51:
    # F3_s52 → F3_t53 (new body)
    with BuildSketch(Plane(origin=(-15.7651840208, 0, -11.6722754965), x_dir=(0, 1, 0), z_dir=(0.8036946592, 0, 0.5950419269))):
        Polygon((0, -13.0738931843), (-3, -16.0738931843), (0, -16.0738931843), align=None)
    extrude(amount=F3_T53_DEPTH)

    split(bisect_by=Plane(origin=(-0.7127680041, 0, -0.9627016388), x_dir=(0, 1, 0), z_dir=(0.5950419269, 0, 0.8036946592)), keep=Keep.TOP)


with BuildPart() as f3_tool55:
    # F3_s56 → F3_t57 (new body)
    with BuildSketch(Plane(origin=(7.0122243563, 0, -5.1917322641), x_dir=(0, 1, 0), z_dir=(0.8036946592, 0, -0.5950419269))):
        Polygon((0, 1.8021549879), (-3, -1.1978450121), (0, -1.1978450121), align=None)
    extrude(amount=F3_T57_DEPTH)

    split(bisect_by=Plane(origin=(9.5646403729, 0, -12.918502105), x_dir=(0, 1, 0), z_dir=(-0.5950419269, 0, 0.8036946592)), keep=Keep.TOP)


with BuildPart() as f3_tool51_1:
    add(f3_tool51.part)

    # F3_t59: intersect F3_tool55
    add(f3_tool55.part, mode=Mode.INTERSECT)


with BuildPart() as f1_21:
    add(f1_20.part)

    # F3_t49: cut F3_tool51
    add(f3_tool51_1.part, mode=Mode.SUBTRACT)


with BuildPart() as f3_tool62:
    # F3_s63 → F3_t64 (new body)
    with BuildSketch(Plane(origin=(-31.913311652, 0, -23.6280759627), x_dir=(0, 1, 0), z_dir=(0.8036946592, 0, 0.5950419269))):
        Polygon((0, 1.8021549879), (-3, -1.1978450121), (0, -1.1978450121), align=None)
    extrude(amount=F3_T64_DEPTH)

    split(bisect_by=Plane(origin=(-9.5646403729, 0, -12.918502105), x_dir=(0, 1, 0), z_dir=(0.5950419269, 0, 0.8036946592)), keep=Keep.TOP)


with BuildPart() as f3_tool66:
    # F3_s67 → F3_t68 (new body)
    with BuildSketch(Plane(origin=(-9.1359032749, 0, 6.7640682021), x_dir=(0, 1, 0), z_dir=(0.8036946592, 0, -0.5950419269))):
        Polygon((0, -13.0738931843), (-3, -16.0738931843), (0, -16.0738931843), align=None)
    extrude(amount=F3_T68_DEPTH)

    split(bisect_by=Plane(origin=(0.7127680041, 0, -0.9627016388), x_dir=(0, 1, 0), z_dir=(-0.5950419269, 0, 0.8036946592)), keep=Keep.TOP)


with BuildPart() as f3_tool62_1:
    add(f3_tool62.part)

    # F3_t70: intersect F3_tool66
    add(f3_tool66.part, mode=Mode.INTERSECT)


with BuildPart() as f1_22:
    add(f1_21.part)

    # F3_t60: cut F3_tool62
    add(f3_tool62_1.part, mode=Mode.SUBTRACT)


with BuildPart() as f3_tool73:
    # F3_s74 → F3_t75 (new body)
    with BuildSketch(Plane(origin=(15.7651840208, 0, 11.6722754965), x_dir=(0, 1, 0), z_dir=(-0.8036946592, 0, -0.5950419269))):
        Polygon((0, -13.0738931843), (-3, -16.0738931843), (0, -16.0738931843), align=None)
    extrude(amount=F3_T75_DEPTH)

    split(bisect_by=Plane(origin=(0.7127680041, 0, 0.9627016388), x_dir=(0, 1, 0), z_dir=(-0.5950419269, 0, -0.8036946592)), keep=Keep.TOP)


with BuildPart() as f3_tool77:
    # F3_s78 → F3_t79 (new body)
    with BuildSketch(Plane(origin=(-7.0122243563, 0, 5.1917322641), x_dir=(0, 1, 0), z_dir=(-0.8036946592, 0, 0.5950419269))):
        Polygon((0, 1.8021549879), (-3, -1.1978450121), (0, -1.1978450121), align=None)
    extrude(amount=F3_T79_DEPTH)

    split(bisect_by=Plane(origin=(-9.5646403729, 0, 12.918502105), x_dir=(0, 1, 0), z_dir=(0.5950419269, 0, -0.8036946592)), keep=Keep.TOP)


with BuildPart() as f3_tool73_1:
    add(f3_tool73.part)

    # F3_t81: intersect F3_tool77
    add(f3_tool77.part, mode=Mode.INTERSECT)


with BuildPart() as f1_23:
    add(f1_22.part)

    # F3_t71: cut F3_tool73
    add(f3_tool73_1.part, mode=Mode.SUBTRACT)


with BuildPart() as f3_tool84:
    # F3_s85 → F3_t86 (new body)
    with BuildSketch(Plane(origin=(31.913311652, 0, 23.6280759627), x_dir=(0, 1, 0), z_dir=(-0.8036946592, 0, -0.5950419269))):
        Polygon((0, 1.8021549879), (-3, -1.1978450121), (0, -1.1978450121), align=None)
    extrude(amount=F3_T86_DEPTH)

    split(bisect_by=Plane(origin=(9.5646403729, 0, 12.918502105), x_dir=(0, 1, 0), z_dir=(-0.5950419269, 0, -0.8036946592)), keep=Keep.TOP)


with BuildPart() as f3_tool88:
    # F3_s89 → F3_t90 (new body)
    with BuildSketch(Plane(origin=(9.1359032749, 0, -6.7640682021), x_dir=(0, 1, 0), z_dir=(-0.8036946592, 0, 0.5950419269))):
        Polygon((0, -13.0738931843), (-3, -16.0738931843), (0, -16.0738931843), align=None)
    extrude(amount=F3_T90_DEPTH)

    split(bisect_by=Plane(origin=(-0.7127680041, 0, 0.9627016388), x_dir=(0, 1, 0), z_dir=(0.5950419269, 0, -0.8036946592)), keep=Keep.TOP)


with BuildPart() as f3_tool84_1:
    add(f3_tool84.part)

    # F3_t92: intersect F3_tool88
    add(f3_tool88.part, mode=Mode.INTERSECT)


with BuildPart() as f1_24:
    add(f1_23.part)

    # F3_t82: cut F3_tool84
    add(f3_tool84_1.part, mode=Mode.SUBTRACT)


solid = f1_24.part
